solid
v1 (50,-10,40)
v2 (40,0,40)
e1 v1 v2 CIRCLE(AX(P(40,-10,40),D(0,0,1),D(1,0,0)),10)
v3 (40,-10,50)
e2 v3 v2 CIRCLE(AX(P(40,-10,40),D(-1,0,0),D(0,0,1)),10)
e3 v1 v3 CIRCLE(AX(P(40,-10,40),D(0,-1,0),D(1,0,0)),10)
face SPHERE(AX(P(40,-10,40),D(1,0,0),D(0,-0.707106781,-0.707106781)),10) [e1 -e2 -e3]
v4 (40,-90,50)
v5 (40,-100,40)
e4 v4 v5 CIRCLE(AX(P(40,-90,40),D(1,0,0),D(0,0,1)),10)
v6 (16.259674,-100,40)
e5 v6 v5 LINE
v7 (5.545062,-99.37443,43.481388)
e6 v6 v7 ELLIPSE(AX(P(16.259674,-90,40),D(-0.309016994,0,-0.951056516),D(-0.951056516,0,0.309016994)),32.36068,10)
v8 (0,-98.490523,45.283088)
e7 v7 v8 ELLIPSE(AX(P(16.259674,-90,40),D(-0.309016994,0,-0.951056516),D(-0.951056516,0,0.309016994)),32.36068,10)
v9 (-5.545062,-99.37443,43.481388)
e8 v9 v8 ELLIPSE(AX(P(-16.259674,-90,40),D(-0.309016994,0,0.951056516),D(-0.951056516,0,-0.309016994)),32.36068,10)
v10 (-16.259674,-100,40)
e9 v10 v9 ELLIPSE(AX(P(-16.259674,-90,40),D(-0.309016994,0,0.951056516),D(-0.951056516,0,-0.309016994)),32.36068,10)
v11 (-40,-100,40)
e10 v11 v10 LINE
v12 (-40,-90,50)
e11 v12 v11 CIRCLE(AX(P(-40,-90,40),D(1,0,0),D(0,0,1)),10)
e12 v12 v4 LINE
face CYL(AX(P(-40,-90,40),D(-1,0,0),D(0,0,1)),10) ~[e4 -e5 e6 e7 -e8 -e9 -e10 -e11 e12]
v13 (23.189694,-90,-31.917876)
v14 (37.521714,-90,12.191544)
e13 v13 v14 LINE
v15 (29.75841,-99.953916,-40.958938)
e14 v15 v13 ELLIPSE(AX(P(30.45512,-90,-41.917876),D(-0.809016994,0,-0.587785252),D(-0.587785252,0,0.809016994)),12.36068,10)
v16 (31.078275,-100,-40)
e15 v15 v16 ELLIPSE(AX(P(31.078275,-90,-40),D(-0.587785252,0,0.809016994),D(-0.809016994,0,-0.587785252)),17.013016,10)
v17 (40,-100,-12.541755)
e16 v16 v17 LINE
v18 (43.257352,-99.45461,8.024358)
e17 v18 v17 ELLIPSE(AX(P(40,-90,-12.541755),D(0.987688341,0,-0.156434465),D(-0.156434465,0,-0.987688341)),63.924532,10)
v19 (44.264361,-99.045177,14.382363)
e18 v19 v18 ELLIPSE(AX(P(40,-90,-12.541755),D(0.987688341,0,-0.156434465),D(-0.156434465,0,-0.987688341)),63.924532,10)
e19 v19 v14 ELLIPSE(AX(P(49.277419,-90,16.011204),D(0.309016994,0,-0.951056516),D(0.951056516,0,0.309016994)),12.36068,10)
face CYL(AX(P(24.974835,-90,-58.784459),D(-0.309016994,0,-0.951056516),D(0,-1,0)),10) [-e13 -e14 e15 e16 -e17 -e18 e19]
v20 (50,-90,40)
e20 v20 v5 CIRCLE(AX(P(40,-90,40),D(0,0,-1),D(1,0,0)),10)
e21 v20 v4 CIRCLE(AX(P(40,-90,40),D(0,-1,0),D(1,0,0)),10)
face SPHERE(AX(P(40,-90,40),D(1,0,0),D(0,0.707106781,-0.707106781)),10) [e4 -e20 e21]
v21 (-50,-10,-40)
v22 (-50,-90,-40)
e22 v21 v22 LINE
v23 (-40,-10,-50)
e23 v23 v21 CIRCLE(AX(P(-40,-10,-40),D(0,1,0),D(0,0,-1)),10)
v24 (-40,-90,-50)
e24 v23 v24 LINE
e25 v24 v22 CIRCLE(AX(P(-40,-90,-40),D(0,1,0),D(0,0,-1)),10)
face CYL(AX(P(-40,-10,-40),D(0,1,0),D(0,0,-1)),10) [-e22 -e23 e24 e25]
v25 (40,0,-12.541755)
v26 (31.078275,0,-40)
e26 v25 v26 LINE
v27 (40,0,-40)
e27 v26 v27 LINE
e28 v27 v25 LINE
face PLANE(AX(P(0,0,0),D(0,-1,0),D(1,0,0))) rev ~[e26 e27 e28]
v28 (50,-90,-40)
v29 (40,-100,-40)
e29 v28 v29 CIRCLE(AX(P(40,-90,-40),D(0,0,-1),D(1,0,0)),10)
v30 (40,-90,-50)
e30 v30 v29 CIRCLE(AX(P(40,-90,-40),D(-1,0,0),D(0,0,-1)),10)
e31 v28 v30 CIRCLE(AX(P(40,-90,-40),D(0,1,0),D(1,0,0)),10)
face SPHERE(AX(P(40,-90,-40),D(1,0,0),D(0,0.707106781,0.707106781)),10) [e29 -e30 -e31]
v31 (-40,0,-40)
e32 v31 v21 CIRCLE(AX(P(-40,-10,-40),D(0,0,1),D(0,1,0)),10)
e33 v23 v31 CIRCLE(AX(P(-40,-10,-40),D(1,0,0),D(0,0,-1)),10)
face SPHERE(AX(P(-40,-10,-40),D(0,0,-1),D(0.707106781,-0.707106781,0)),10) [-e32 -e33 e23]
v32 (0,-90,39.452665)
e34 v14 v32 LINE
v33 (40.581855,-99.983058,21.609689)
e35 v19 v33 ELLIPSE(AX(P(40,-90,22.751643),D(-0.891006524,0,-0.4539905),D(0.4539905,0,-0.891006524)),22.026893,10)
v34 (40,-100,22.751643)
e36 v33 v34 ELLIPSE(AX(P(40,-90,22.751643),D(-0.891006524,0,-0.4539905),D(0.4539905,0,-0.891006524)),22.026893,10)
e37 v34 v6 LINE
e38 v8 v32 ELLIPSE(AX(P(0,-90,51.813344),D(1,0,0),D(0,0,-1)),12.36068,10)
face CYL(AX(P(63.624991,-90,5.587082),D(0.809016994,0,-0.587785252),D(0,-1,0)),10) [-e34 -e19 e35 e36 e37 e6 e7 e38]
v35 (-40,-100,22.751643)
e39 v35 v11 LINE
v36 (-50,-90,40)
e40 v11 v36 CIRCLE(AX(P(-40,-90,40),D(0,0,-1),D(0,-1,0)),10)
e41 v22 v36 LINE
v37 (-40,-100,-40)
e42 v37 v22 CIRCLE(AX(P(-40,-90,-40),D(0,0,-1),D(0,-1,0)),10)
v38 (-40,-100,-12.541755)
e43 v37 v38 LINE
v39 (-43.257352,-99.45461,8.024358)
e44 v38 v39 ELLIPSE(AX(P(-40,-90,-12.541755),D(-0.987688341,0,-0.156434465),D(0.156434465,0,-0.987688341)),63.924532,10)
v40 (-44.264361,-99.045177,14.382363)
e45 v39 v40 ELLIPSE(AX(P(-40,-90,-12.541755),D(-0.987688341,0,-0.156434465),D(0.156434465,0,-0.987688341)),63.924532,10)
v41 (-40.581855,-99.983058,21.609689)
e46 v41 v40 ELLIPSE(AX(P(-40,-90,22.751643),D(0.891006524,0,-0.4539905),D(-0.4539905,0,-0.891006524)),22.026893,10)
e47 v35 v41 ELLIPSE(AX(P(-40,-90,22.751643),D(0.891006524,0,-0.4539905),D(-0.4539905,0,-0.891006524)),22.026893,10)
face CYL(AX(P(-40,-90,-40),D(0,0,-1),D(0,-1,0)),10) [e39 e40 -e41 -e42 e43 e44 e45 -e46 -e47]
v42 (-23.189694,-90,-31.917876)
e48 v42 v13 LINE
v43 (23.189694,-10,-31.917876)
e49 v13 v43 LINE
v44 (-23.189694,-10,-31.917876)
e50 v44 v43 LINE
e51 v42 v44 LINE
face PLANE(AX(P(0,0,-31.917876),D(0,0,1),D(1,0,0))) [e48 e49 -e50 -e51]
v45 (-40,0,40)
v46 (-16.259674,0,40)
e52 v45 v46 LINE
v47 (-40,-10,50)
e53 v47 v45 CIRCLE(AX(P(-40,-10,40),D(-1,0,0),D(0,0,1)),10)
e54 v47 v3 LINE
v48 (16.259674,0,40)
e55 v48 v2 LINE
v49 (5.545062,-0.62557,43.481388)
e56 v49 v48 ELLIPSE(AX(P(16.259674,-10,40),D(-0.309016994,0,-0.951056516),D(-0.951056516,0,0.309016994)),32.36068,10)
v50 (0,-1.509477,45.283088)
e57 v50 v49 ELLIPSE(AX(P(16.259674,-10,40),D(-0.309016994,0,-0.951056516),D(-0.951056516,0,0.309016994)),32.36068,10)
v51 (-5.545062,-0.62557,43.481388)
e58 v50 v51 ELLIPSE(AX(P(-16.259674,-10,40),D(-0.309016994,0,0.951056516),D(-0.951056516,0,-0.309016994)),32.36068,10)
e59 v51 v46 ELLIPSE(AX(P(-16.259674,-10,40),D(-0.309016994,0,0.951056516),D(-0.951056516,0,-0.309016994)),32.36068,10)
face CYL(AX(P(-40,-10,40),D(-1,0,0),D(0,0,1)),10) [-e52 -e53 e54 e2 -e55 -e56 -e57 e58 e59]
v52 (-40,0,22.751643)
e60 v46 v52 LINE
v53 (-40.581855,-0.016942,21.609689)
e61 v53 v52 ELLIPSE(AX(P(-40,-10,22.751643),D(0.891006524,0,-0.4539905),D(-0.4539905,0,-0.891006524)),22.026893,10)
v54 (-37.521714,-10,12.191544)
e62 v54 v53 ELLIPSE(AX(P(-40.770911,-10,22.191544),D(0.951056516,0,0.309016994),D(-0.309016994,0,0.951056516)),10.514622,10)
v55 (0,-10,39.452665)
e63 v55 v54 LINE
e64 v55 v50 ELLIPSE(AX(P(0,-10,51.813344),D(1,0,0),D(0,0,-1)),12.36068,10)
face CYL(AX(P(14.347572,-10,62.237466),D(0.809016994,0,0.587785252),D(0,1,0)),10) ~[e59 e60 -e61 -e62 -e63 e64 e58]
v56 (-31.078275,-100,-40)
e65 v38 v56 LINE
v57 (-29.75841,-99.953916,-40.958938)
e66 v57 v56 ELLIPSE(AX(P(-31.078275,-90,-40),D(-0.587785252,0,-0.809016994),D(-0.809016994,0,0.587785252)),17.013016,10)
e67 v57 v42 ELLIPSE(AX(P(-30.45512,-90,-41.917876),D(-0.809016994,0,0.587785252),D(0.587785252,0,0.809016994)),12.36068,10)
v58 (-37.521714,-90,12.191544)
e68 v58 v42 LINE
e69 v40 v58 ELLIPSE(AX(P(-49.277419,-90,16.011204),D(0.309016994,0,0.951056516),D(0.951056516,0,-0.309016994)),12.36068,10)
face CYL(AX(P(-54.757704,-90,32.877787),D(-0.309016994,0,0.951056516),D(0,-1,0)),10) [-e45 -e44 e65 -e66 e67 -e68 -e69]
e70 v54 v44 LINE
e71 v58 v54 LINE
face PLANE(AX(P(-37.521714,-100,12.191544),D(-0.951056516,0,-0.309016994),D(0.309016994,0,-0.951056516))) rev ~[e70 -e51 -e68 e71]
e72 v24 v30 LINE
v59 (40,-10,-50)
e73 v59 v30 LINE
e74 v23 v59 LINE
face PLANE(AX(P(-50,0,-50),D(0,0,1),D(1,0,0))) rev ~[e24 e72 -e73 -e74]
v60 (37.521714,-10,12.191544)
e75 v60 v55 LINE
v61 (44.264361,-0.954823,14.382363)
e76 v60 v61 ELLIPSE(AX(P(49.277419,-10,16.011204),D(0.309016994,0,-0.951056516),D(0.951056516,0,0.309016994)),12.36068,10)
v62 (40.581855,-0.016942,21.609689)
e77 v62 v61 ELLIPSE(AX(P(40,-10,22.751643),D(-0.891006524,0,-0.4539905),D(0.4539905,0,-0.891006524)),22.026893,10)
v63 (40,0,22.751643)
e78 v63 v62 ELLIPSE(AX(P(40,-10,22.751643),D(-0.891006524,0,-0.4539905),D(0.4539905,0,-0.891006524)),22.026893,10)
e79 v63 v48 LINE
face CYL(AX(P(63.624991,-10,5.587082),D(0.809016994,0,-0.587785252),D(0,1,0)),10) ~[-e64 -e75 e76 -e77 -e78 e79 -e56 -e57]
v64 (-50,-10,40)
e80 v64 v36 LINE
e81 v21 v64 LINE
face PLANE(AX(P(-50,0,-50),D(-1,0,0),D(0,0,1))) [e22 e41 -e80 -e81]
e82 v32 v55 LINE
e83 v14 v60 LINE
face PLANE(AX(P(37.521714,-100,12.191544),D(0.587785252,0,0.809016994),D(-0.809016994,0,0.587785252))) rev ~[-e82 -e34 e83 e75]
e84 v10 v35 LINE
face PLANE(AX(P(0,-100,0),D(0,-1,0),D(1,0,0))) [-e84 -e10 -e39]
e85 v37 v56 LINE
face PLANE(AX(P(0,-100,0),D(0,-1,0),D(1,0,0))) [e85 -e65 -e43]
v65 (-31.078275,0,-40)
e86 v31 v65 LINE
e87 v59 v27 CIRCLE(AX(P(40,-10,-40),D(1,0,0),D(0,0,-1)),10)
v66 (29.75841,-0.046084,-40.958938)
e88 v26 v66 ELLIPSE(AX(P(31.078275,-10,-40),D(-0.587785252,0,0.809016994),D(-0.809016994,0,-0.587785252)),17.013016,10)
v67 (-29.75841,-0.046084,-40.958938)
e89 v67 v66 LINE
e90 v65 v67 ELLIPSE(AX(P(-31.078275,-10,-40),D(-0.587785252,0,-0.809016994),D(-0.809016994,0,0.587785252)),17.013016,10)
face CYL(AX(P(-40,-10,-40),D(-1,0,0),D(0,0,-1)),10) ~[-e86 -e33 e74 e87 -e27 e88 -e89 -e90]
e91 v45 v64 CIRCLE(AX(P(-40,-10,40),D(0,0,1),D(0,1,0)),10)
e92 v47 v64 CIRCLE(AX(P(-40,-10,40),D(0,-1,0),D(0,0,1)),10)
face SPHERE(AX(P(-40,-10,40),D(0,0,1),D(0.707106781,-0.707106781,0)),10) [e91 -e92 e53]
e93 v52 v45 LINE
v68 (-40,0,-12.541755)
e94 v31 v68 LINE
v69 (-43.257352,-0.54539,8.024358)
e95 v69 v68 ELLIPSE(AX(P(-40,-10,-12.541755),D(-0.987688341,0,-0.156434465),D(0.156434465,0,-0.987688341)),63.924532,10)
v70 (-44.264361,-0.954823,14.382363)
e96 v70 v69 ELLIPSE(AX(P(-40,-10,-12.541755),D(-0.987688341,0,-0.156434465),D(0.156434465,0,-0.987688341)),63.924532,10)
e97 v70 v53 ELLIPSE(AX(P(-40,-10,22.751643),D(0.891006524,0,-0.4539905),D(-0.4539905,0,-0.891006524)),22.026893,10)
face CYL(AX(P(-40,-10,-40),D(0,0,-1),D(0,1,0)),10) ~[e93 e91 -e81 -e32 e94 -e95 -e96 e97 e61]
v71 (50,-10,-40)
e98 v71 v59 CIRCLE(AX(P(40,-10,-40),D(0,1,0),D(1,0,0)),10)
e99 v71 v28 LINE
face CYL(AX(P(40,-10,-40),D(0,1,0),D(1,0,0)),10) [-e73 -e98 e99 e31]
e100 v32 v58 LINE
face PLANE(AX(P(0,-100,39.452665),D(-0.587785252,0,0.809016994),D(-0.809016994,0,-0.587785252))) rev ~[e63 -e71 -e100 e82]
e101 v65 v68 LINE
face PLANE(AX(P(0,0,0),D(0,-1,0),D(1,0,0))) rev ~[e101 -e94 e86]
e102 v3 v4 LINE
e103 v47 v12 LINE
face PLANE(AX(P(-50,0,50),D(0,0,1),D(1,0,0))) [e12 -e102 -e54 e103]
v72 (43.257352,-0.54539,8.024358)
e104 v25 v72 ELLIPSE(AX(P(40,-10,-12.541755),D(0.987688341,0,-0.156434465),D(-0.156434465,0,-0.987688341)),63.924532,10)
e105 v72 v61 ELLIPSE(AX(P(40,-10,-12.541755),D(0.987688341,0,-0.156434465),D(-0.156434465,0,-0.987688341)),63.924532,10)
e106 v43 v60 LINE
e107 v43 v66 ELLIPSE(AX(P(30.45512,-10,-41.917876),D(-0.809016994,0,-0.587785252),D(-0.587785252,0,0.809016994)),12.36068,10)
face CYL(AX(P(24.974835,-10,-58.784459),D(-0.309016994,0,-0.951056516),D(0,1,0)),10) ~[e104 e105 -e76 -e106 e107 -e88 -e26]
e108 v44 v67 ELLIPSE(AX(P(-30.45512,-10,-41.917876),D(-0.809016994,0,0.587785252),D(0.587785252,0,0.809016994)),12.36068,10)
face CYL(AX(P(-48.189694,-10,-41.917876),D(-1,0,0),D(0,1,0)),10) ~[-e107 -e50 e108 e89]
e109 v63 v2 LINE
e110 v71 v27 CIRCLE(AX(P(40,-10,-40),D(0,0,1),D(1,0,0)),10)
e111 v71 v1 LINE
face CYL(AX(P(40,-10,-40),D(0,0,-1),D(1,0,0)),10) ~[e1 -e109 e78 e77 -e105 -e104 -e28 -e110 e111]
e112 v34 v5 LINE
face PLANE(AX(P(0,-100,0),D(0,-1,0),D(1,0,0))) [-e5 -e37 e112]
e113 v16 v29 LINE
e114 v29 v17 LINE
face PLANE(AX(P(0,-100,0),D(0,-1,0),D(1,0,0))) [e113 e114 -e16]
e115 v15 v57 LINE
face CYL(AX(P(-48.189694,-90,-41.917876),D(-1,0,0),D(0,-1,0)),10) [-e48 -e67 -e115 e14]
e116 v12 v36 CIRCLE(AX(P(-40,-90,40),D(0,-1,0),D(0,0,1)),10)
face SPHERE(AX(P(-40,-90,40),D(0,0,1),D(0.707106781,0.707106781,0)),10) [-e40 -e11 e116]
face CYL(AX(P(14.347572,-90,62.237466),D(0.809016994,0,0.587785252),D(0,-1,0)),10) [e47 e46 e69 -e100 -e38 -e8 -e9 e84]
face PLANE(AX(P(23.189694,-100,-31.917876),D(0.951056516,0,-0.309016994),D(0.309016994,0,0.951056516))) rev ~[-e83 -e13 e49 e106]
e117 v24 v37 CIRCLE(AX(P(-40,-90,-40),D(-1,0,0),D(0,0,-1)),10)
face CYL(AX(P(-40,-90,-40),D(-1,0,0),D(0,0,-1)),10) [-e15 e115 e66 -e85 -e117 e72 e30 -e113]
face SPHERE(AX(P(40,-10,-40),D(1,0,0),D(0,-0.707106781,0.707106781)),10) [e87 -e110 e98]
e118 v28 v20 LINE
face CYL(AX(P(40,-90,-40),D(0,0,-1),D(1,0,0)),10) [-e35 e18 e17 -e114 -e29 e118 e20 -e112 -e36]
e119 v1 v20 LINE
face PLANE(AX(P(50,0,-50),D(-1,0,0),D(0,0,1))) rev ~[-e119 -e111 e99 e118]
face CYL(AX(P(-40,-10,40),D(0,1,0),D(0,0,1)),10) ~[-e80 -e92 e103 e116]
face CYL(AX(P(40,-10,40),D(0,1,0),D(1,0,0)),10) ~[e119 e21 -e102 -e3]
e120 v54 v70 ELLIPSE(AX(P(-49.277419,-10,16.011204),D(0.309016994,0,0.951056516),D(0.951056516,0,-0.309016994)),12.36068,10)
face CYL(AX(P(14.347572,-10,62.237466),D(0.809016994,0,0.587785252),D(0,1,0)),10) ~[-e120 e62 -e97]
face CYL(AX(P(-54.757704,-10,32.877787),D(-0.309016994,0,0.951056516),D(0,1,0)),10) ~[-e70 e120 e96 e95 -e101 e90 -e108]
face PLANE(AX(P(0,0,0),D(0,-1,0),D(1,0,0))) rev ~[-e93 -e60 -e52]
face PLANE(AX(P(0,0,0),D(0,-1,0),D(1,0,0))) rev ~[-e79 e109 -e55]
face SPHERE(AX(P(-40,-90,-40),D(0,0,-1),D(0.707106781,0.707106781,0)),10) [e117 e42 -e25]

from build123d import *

# Parameters (mm, degrees)
F0_W          = 100
F0_H          = 100
F1_DEPTH      = 100
F3_DEPTH      = 134.3
F4_T1_DEPTH   = 80
F4_T3_DEPTH   = 80
F4_T5_DEPTH   = 80
F4_S9_W       = 10
F4_S9_H       = 10
F4_T10_DEPTH  = 10
F4_S15_W      = 10
F4_S15_H      = 10
F4_T16_DEPTH  = 10
F4_S21_W      = 10
F4_S21_H      = 10
F4_T22_DEPTH  = 10
F4_S27_W      = 10
F4_S27_H      = 10
F4_T28_DEPTH  = 10
F4_S33_W      = 10
F4_S33_H      = 10
F4_T34_DEPTH  = 10
F4_S39_W      = 10
F4_S39_H      = 10
F4_T40_DEPTH  = 10
F4_S45_W      = 10
F4_S45_H      = 10
F4_T46_DEPTH  = 10
F4_S51_W      = 10
F4_S51_H      = 10
F4_T52_DEPTH  = 10
F4_T58_DEPTH  = 96.3793887771
F4_T64_DEPTH  = 96.3793887771
F4_T70_DEPTH  = 96.3793887771
F4_T76_DEPTH  = 96.3793887771
F4_T82_DEPTH  = 96.3793887771
F4_T88_DEPTH  = 96.3793887771
F4_T94_DEPTH  = 96.3793887771
F4_T100_DEPTH = 96.3793887771
F4_T106_DEPTH = 96.3793887771
F4_T112_DEPTH = 96.3793887771
F4_T119_DEPTH = 96.3793887771
F4_T123_DEPTH = 96.3793887771
F4_T130_DEPTH = 96.3793887771
F4_T134_DEPTH = 96.3793887771
F4_T141_DEPTH = 96.3793887771
F4_T145_DEPTH = 96.3793887771
F4_T152_DEPTH = 96.3793887771
F4_T156_DEPTH = 96.3793887771
F4_T163_DEPTH = 96.3793887771
F4_T167_DEPTH = 96.3793887771
F4_T174_DEPTH = 96.3793887771
F4_T178_DEPTH = 96.3793887771
F4_T185_DEPTH = 96.3793887771
F4_T189_DEPTH = 96.3793887771
F4_T196_DEPTH = 96.3793887771
F4_T200_DEPTH = 96.3793887771
F4_T207_DEPTH = 96.3793887771
F4_T211_DEPTH = 96.3793887771
F4_T218_DEPTH = 96.3793887771
F4_T222_DEPTH = 96.3793887771


# Not quite as in the source:
# - a fillet or chamfer that OpenCascade refuses, or shapes differently, is made with other operations: its cross-section is extruded or revolved along the edge and cut away or added


with BuildPart() as f1:
    # F0 (on Front) → F1 (new body)
    with BuildSketch(Plane.XZ):
        Rectangle(F0_W, F0_H)
    extrude(amount=F1_DEPTH)

    # F2 (on face) → F3 (cut)
    with BuildSketch(Plane.XZ.offset(100)):
        Polygon((37.5217137094, 12.1915438206), (0, 39.4526645541), (-37.5217137094, 12.1915438206), (-23.1896943886, -31.9178760977), (23.1896943886, -31.9178760977), align=None)
    extrude(amount=-F3_DEPTH, mode=Mode.SUBTRACT)

    # F4: fillet of radius 10 on 22 edges, made by hand

    # F4_s2 → F4_t1 (cut)
    with BuildSketch(Plane.XZ.offset(10)):
        with BuildLine():
            ThreePointArc((50, -40), (47.0710678119, -47.0710678119), (40, -50))
            Line((40, -50), (50, -50))
            Line((50, -50), (50, -40))
        make_face()
        with BuildLine():
            ThreePointArc((50, 40), (47.0710678119, 47.0710678119), (40, 50))
            Line((40, 50), (50, 50))
            Line((50, 50), (50, 40))
        make_face()
        with BuildLine():
            ThreePointArc((-40, 50), (-47.0710678119, 47.0710678119), (-50, 40))
            Line((-50, 40), (-50, 50))
            Line((-50, 50), (-40, 50))
        make_face()
        with BuildLine():
            ThreePointArc((-40, -50), (-47.0710678119, -47.0710678119), (-50, -40))
            Line((-50, -40), (-50, -50))
            Line((-50, -50), (-40, -50))
        make_face()
    extrude(amount=F4_T1_DEPTH, mode=Mode.SUBTRACT)

    # F4_s4 → F4_t3 (cut)
    with BuildSketch(Plane.XY.offset(-40)):
        with BuildLine():
            ThreePointArc((50, -10), (47.0710678119, -2.9289321881), (40, 0))
            Line((40, 0), (50, 0))
            Line((50, 0), (50, -10))
        make_face()
        with BuildLine():
            ThreePointArc((50, -90), (47.0710678119, -97.0710678119), (40, -100))
            Line((40, -100), (50, -100))
            Line((50, -100), (50, -90))
        make_face()
        with BuildLine():
            ThreePointArc((-40, 0), (-47.0710678119, -2.9289321881), (-50, -10))
            Line((-50, -10), (-50, 0))
            Line((-50, 0), (-40, 0))
        make_face()
        with BuildLine():
            ThreePointArc((-40, -100), (-47.0710678119, -97.0710678119), (-50, -90))
            Line((-50, -90), (-50, -100))
            Line((-50, -100), (-40, -100))
        make_face()
    extrude(amount=F4_T3_DEPTH, mode=Mode.SUBTRACT)

    # F4_s6 → F4_t5 (cut)
    with BuildSketch(Plane.YZ.offset(-40)):
        with BuildLine():
            ThreePointArc((-10, 50), (-2.9289321881, 47.0710678119), (0, 40))
            Line((0, 40), (0, 50))
            Line((0, 50), (-10, 50))
        make_face()
        with BuildLine():
            ThreePointArc((-90, 50), (-97.0710678119, 47.0710678119), (-100, 40))
            Line((-100, 40), (-100, 50))
            Line((-100, 50), (-90, 50))
        make_face()
        with BuildLine():
            ThreePointArc((-10, -50), (-2.9289321881, -47.0710678119), (0, -40))
            Line((0, -40), (0, -50))
            Line((0, -50), (-10, -50))
        make_face()
        with BuildLine():
            ThreePointArc((-90, -50), (-97.0710678119, -47.0710678119), (-100, -40))
            Line((-100, -40), (-100, -50))
            Line((-100, -50), (-90, -50))
        make_face()
    extrude(amount=F4_T5_DEPTH, mode=Mode.SUBTRACT)


with BuildPart() as f4_tool8:
    # F4_s9 → F4_t10 (new body)
    with BuildSketch(Plane.YZ.offset(40)):
        with Locations((-5, -45)):
            Rectangle(F4_S9_W, F4_S9_H)
    extrude(amount=F4_T10_DEPTH)

    # F4_s11 → F4_t12 (revolve, cut)
    with BuildSketch(Plane(origin=(40, -10, -40), x_dir=(0, -0.7071067812, 0.7071067812), z_dir=(0, 0.7071067812, 0.7071067812))):
        with BuildLine():
            ThreePointArc((0, -10), (10, 0), (0, 10))
            Line((0, 10), (0, -10))
        make_face()
    revolve(axis=Axis((40, -10, -40), (1, 0, 0)), mode=Mode.SUBTRACT)


with BuildPart() as f1_1:
    add(f1.part)

    # F4_t7: cut F4_tool8
    add(f4_tool8.part, mode=Mode.SUBTRACT)


with BuildPart() as f4_tool14:
    # F4_s15 → F4_t16 (new body)
    with BuildSketch(Plane.YZ.offset(40)):
        with Locations((-95, -45)):
            Rectangle(F4_S15_W, F4_S15_H)
    extrude(amount=F4_T16_DEPTH)

    # F4_s17 → F4_t18 (revolve, cut)
    with BuildSketch(Plane(origin=(40, -90, -40), x_dir=(0, 0.7071067812, 0.7071067812), z_dir=(0, 0.7071067812, -0.7071067812))):
        with BuildLine():
            ThreePointArc((0, -10), (10, 0), (0, 10))
            Line((0, 10), (0, -10))
        make_face()
    revolve(axis=Axis((40, -90, -40), (1, 0, 0)), mode=Mode.SUBTRACT)


with BuildPart() as f1_2:
    add(f1_1.part)

    # F4_t13: cut F4_tool14
    add(f4_tool14.part, mode=Mode.SUBTRACT)


with BuildPart() as f4_tool20:
    # F4_s21 → F4_t22 (new body)
    with BuildSketch(Plane.YZ.offset(40)):
        with Locations((-5, 45)):
            Rectangle(F4_S21_W, F4_S21_H)
    extrude(amount=F4_T22_DEPTH)

    # F4_s23 → F4_t24 (revolve, cut)
    with BuildSketch(Plane(origin=(40, -10, 40), x_dir=(0, -0.7071067812, -0.7071067812), z_dir=(0, -0.7071067812, 0.7071067812))):
        with BuildLine():
            ThreePointArc((0, -10), (10, 0), (0, 10))
            Line((0, 10), (0, -10))
        make_face()
    revolve(axis=Axis((40, -10, 40), (1, 0, 0)), mode=Mode.SUBTRACT)


with BuildPart() as f1_3:
    add(f1_2.part)

    # F4_t19: cut F4_tool20
    add(f4_tool20.part, mode=Mode.SUBTRACT)


with BuildPart() as f4_tool26:
    # F4_s27 → F4_t28 (new body)
    with BuildSketch(Plane.YZ.offset(40)):
        with Locations((-95, 45)):
            Rectangle(F4_S27_W, F4_S27_H)
    extrude(amount=F4_T28_DEPTH)

    # F4_s29 → F4_t30 (revolve, cut)
    with BuildSketch(Plane(origin=(40, -90, 40), x_dir=(0, 0.7071067812, -0.7071067812), z_dir=(0, -0.7071067812, -0.7071067812))):
        with BuildLine():
            ThreePointArc((0, -10), (10, 0), (0, 10))
            Line((0, 10), (0, -10))
        make_face()
    revolve(axis=Axis((40, -90, 40), (1, 0, 0)), mode=Mode.SUBTRACT)


with BuildPart() as f1_4:
    add(f1_3.part)

    # F4_t25: cut F4_tool26
    add(f4_tool26.part, mode=Mode.SUBTRACT)


with BuildPart() as f4_tool32:
    # F4_s33 → F4_t34 (new body)
    with BuildSketch(Plane.XY.offset(40)):
        with Locations((-45, -5)):
            Rectangle(F4_S33_W, F4_S33_H)
    extrude(amount=F4_T34_DEPTH)

    # F4_s35 → F4_t36 (revolve, cut)
    with BuildSketch(Plane(origin=(-40, -10, 40), x_dir=(0.7071067812, -0.7071067812, 0), z_dir=(-0.7071067812, -0.7071067812, 0))):
        with BuildLine():
            ThreePointArc((0, -10), (10, 0), (0, 10))
            Line((0, 10), (0, -10))
        make_face()
    revolve(axis=Axis((-40, -10, 40), (0, 0, 1)), mode=Mode.SUBTRACT)


with BuildPart() as f1_5:
    add(f1_4.part)

    # F4_t31: cut F4_tool32
    add(f4_tool32.part, mode=Mode.SUBTRACT)


with BuildPart() as f4_tool38:
    # F4_s39 → F4_t40 (new body)
    with BuildSketch(Plane.XY.offset(40)):
        with Locations((-45, -95)):
            Rectangle(F4_S39_W, F4_S39_H)
    extrude(amount=F4_T40_DEPTH)

    # F4_s41 → F4_t42 (revolve, cut)
    with BuildSketch(Plane(origin=(-40, -90, 40), x_dir=(0.7071067812, 0.7071067812, 0), z_dir=(0.7071067812, -0.7071067812, 0))):
        with BuildLine():
            ThreePointArc((0, -10), (10, 0), (0, 10))
            Line((0, 10), (0, -10))
        make_face()
    revolve(axis=Axis((-40, -90, 40), (0, 0, 1)), mode=Mode.SUBTRACT)


with BuildPart() as f1_6:
    add(f1_5.part)

    # F4_t37: cut F4_tool38
    add(f4_tool38.part, mode=Mode.SUBTRACT)


with BuildPart() as f4_tool44:
    # F4_s45 → F4_t46 (new body)
    with BuildSketch(Plane.XY.offset(-40)):
        with Locations((-45, -5)):
            Rectangle(F4_S45_W, F4_S45_H)
    extrude(amount=-F4_T46_DEPTH)

    # F4_s47 → F4_t48 (revolve, cut)
    with BuildSketch(Plane(origin=(-40, -10, -40), x_dir=(0.7071067812, -0.7071067812, 0), z_dir=(0.7071067812, 0.7071067812, 0))):
        with BuildLine():
            ThreePointArc((0, -10), (10, 0), (0, 10))
            Line((0, 10), (0, -10))
        make_face()
    revolve(axis=Axis((-40, -10, -40), (0, 0, -1)), mode=Mode.SUBTRACT)


with BuildPart() as f1_7:
    add(f1_6.part)

    # F4_t43: cut F4_tool44
    add(f4_tool44.part, mode=Mode.SUBTRACT)


with BuildPart() as f4_tool50:
    # F4_s51 → F4_t52 (new body)
    with BuildSketch(Plane.XY.offset(-40)):
        with Locations((-45, -95)):
            Rectangle(F4_S51_W, F4_S51_H)
    extrude(amount=-F4_T52_DEPTH)

    # F4_s53 → F4_t54 (revolve, cut)
    with BuildSketch(Plane(origin=(-40, -90, -40), x_dir=(0.7071067812, 0.7071067812, 0), z_dir=(-0.7071067812, 0.7071067812, 0))):
        with BuildLine():
            ThreePointArc((0, -10), (10, 0), (0, 10))
            Line((0, 10), (0, -10))
        make_face()
    revolve(axis=Axis((-40, -90, -40), (0, 0, -1)), mode=Mode.SUBTRACT)


with BuildPart() as f1_8:
    add(f1_7.part)

    # F4_t49: cut F4_tool50
    add(f4_tool50.part, mode=Mode.SUBTRACT)


with BuildPart() as f4_tool56:
    # F4_s57 → F4_t58 (new body)
    with BuildSketch(Plane(origin=(38.9862817141, 0, -28.3251916741), x_dir=(0, 1, 0), z_dir=(-0.8090169944, 0, 0.5877852523))):
        with BuildLine():
            ThreePointArc((0, -41.9178760977), (-2.9289321881, -34.8468082858), (-10, -31.9178760977))
            Line((-10, -31.9178760977), (0, -31.9178760977))
            Line((0, -31.9178760977), (0, -41.9178760977))
        make_face()
    extrude(amount=F4_T58_DEPTH)

    split(bisect_by=Plane(origin=(-18.7608568547, 0, 25.8221041874), x_dir=(0, 1, 0), z_dir=(0.5877852523, 0, -0.8090169944)), keep=Keep.TOP)

    split(bisect_by=Plane(origin=(30.355704049, 0, -9.8631661385), x_dir=(0, 1, 0), z_dir=(-0.9510565163, 0, 0.3090169944)), keep=Keep.TOP)


with BuildPart() as f1_9:
    add(f1_8.part)

    # F4_t55: cut F4_tool56
    add(f4_tool56.part, mode=Mode.SUBTRACT)


with BuildPart() as f4_tool62:
    # F4_s63 → F4_t64 (new body)
    with BuildSketch(Plane(origin=(38.9862817141, 0, 28.3251916741), x_dir=(0, 1, 0), z_dir=(-0.8090169944, 0, -0.5877852523))):
        with BuildLine():
            ThreePointArc((0, -41.9178760977), (-2.9289321881, -34.8468082858), (-10, -31.9178760977))
            Line((-10, -31.9178760977), (0, -31.9178760977))
            Line((0, -31.9178760977), (0, -41.9178760977))
        make_face()
    extrude(amount=F4_T64_DEPTH)

    split(bisect_by=Plane(origin=(18.7608568547, 0, 25.8221041874), x_dir=(0, 1, 0), z_dir=(-0.5877852523, 0, -0.8090169944)), keep=Keep.TOP)

    split(bisect_by=Plane(origin=(-30.355704049, 0, -9.8631661385), x_dir=(0, 1, 0), z_dir=(0.9510565163, 0, 0.3090169944)), keep=Keep.TOP)


with BuildPart() as f1_10:
    add(f1_9.part)

    # F4_t61: cut F4_tool62
    add(f4_tool62.part, mode=Mode.SUBTRACT)


with BuildPart() as f4_tool68:
    # F4_s69 → F4_t70 (new body)
    with BuildSketch(Plane(origin=(-14.8914345198, 0, 45.8311228665), x_dir=(0, 1, 0), z_dir=(0.3090169944, 0, -0.9510565163))):
        with BuildLine():
            ThreePointArc((0, -41.9178760977), (-2.9289321881, -34.8468082858), (-10, -31.9178760977))
            Line((-10, -31.9178760977), (0, -31.9178760977))
            Line((0, -31.9178760977), (0, -41.9178760977))
        make_face()
    extrude(amount=F4_T70_DEPTH)

    split(bisect_by=Plane(origin=(-18.7608568547, 0, 25.8221041874), x_dir=(0, 1, 0), z_dir=(0.5877852523, 0, -0.8090169944)), keep=Keep.TOP)

    split(bisect_by=Plane.XY.offset(-31.9178760977), keep=Keep.TOP)


with BuildPart() as f1_11:
    add(f1_10.part)

    # F4_t67: cut F4_tool68
    add(f4_tool68.part, mode=Mode.SUBTRACT)


with BuildPart() as f4_tool74:
    # F4_s75 → F4_t76 (new body)
    with BuildSketch(Plane.YZ.offset(-48.1896943886)):
        with BuildLine():
            ThreePointArc((0, -41.9178760977), (-2.9289321881, -34.8468082858), (-10, -31.9178760977))
            Line((-10, -31.9178760977), (0, -31.9178760977))
            Line((0, -31.9178760977), (0, -41.9178760977))
        make_face()
    extrude(amount=F4_T76_DEPTH)

    split(bisect_by=Plane(origin=(-30.355704049, 0, -9.8631661385), x_dir=(0, 1, 0), z_dir=(0.9510565163, 0, 0.3090169944)), keep=Keep.TOP)

    split(bisect_by=Plane(origin=(30.355704049, 0, -9.8631661385), x_dir=(0, 1, 0), z_dir=(-0.9510565163, 0, 0.3090169944)), keep=Keep.TOP)


with BuildPart() as f1_12:
    add(f1_11.part)

    # F4_t73: cut F4_tool74
    add(f4_tool74.part, mode=Mode.SUBTRACT)


with BuildPart() as f4_tool80:
    # F4_s81 → F4_t82 (new body)
    with BuildSketch(Plane(origin=(-14.8914345198, 0, -45.8311228665), x_dir=(0, 1, 0), z_dir=(0.3090169944, 0, 0.9510565163))):
        with BuildLine():
            ThreePointArc((0, -41.9178760977), (-2.9289321881, -34.8468082858), (-10, -31.9178760977))
            Line((-10, -31.9178760977), (0, -31.9178760977))
            Line((0, -31.9178760977), (0, -41.9178760977))
        make_face()
    extrude(amount=F4_T82_DEPTH)

    split(bisect_by=Plane(origin=(18.7608568547, 0, 25.8221041874), x_dir=(0, 1, 0), z_dir=(-0.5877852523, 0, -0.8090169944)), keep=Keep.TOP)

    split(bisect_by=Plane.XY.offset(-31.9178760977), keep=Keep.TOP)


with BuildPart() as f1_13:
    add(f1_12.part)

    # F4_t79: cut F4_tool80
    add(f4_tool80.part, mode=Mode.SUBTRACT)


with BuildPart() as f4_tool86:
    # F4_s87 → F4_t88 (new body)
    with BuildSketch(Plane(origin=(38.9862817141, 0, -28.3251916741), x_dir=(0, 1, 0), z_dir=(-0.8090169944, 0, 0.5877852523))):
        with BuildLine():
            ThreePointArc((-100, -41.9178760977), (-97.0710678119, -34.8468082858), (-90, -31.9178760977))
            Line((-90, -31.9178760977), (-100, -31.9178760977))
            Line((-100, -31.9178760977), (-100, -41.9178760977))
        make_face()
    extrude(amount=F4_T88_DEPTH)

    split(bisect_by=Plane(origin=(-18.7608568547, 0, 25.8221041874), x_dir=(0, 1, 0), z_dir=(0.5877852523, 0, -0.8090169944)), keep=Keep.TOP)

    split(bisect_by=Plane(origin=(30.355704049, 0, -9.8631661385), x_dir=(0, 1, 0), z_dir=(-0.9510565163, 0, 0.3090169944)), keep=Keep.TOP)


with BuildPart() as f1_14:
    add(f1_13.part)

    # F4_t85: cut F4_tool86
    add(f4_tool86.part, mode=Mode.SUBTRACT)


with BuildPart() as f4_tool92:
    # F4_s93 → F4_t94 (new body)
    with BuildSketch(Plane(origin=(38.9862817141, 0, 28.3251916741), x_dir=(0, 1, 0), z_dir=(-0.8090169944, 0, -0.5877852523))):
        with BuildLine():
            ThreePointArc((-100, -41.9178760977), (-97.0710678119, -34.8468082858), (-90, -31.9178760977))
            Line((-90, -31.9178760977), (-100, -31.9178760977))
            Line((-100, -31.9178760977), (-100, -41.9178760977))
        make_face()
    extrude(amount=F4_T94_DEPTH)

    split(bisect_by=Plane(origin=(18.7608568547, 0, 25.8221041874), x_dir=(0, 1, 0), z_dir=(-0.5877852523, 0, -0.8090169944)), keep=Keep.TOP)

    split(bisect_by=Plane(origin=(-30.355704049, 0, -9.8631661385), x_dir=(0, 1, 0), z_dir=(0.9510565163, 0, 0.3090169944)), keep=Keep.TOP)


with BuildPart() as f1_15:
    add(f1_14.part)

    # F4_t91: cut F4_tool92
    add(f4_tool92.part, mode=Mode.SUBTRACT)


with BuildPart() as f4_tool98:
    # F4_s99 → F4_t100 (new body)
    with BuildSketch(Plane(origin=(-14.8914345198, 0, 45.8311228665), x_dir=(0, 1, 0), z_dir=(0.3090169944, 0, -0.9510565163))):
        with BuildLine():
            ThreePointArc((-100, -41.9178760977), (-97.0710678119, -34.8468082858), (-90, -31.9178760977))
            Line((-90, -31.9178760977), (-100, -31.9178760977))
            Line((-100, -31.9178760977), (-100, -41.9178760977))
        make_face()
    extrude(amount=F4_T100_DEPTH)

    split(bisect_by=Plane(origin=(-18.7608568547, 0, 25.8221041874), x_dir=(0, 1, 0), z_dir=(0.5877852523, 0, -0.8090169944)), keep=Keep.TOP)

    split(bisect_by=Plane.XY.offset(-31.9178760977), keep=Keep.TOP)


with BuildPart() as f1_16:
    add(f1_15.part)

    # F4_t97: cut F4_tool98
    add(f4_tool98.part, mode=Mode.SUBTRACT)


with BuildPart() as f4_tool104:
    # F4_s105 → F4_t106 (new body)
    with BuildSketch(Plane.YZ.offset(-48.1896943886)):
        with BuildLine():
            ThreePointArc((-100, -41.9178760977), (-97.0710678119, -34.8468082858), (-90, -31.9178760977))
            Line((-90, -31.9178760977), (-100, -31.9178760977))
            Line((-100, -31.9178760977), (-100, -41.9178760977))
        make_face()
    extrude(amount=F4_T106_DEPTH)

    split(bisect_by=Plane(origin=(-30.355704049, 0, -9.8631661385), x_dir=(0, 1, 0), z_dir=(0.9510565163, 0, 0.3090169944)), keep=Keep.TOP)

    split(bisect_by=Plane(origin=(30.355704049, 0, -9.8631661385), x_dir=(0, 1, 0), z_dir=(-0.9510565163, 0, 0.3090169944)), keep=Keep.TOP)


with BuildPart() as f1_17:
    add(f1_16.part)

    # F4_t103: cut F4_tool104
    add(f4_tool104.part, mode=Mode.SUBTRACT)


with BuildPart() as f4_tool110:
    # F4_s111 → F4_t112 (new body)
    with BuildSketch(Plane(origin=(-14.8914345198, 0, -45.8311228665), x_dir=(0, 1, 0), z_dir=(0.3090169944, 0, 0.9510565163))):
        with BuildLine():
            ThreePointArc((-100, -41.9178760977), (-97.0710678119, -34.8468082858), (-90, -31.9178760977))
            Line((-90, -31.9178760977), (-100, -31.9178760977))
            Line((-100, -31.9178760977), (-100, -41.9178760977))
        make_face()
    extrude(amount=F4_T112_DEPTH)

    split(bisect_by=Plane(origin=(18.7608568547, 0, 25.8221041874), x_dir=(0, 1, 0), z_dir=(-0.5877852523, 0, -0.8090169944)), keep=Keep.TOP)

    split(bisect_by=Plane.XY.offset(-31.9178760977), keep=Keep.TOP)


with BuildPart() as f1_18:
    add(f1_17.part)

    # F4_t109: cut F4_tool110
    add(f4_tool110.part, mode=Mode.SUBTRACT)


with BuildPart() as f4_tool117:
    # F4_s118 → F4_t119 (new body)
    with BuildSketch(Plane(origin=(38.9862817141, 0, -28.3251916741), x_dir=(0, 1, 0), z_dir=(-0.8090169944, 0, 0.5877852523))):
        with BuildLine():
            ThreePointArc((0, -41.9178760977), (-2.9289321881, -34.8468082858), (-10, -31.9178760977))
            Line((-10, -31.9178760977), (0, -31.9178760977))
            Line((0, -31.9178760977), (0, -41.9178760977))
        make_face()
    extrude(amount=F4_T119_DEPTH)

    split(bisect_by=Plane(origin=(30.355704049, 0, -9.8631661385), x_dir=(0, 1, 0), z_dir=(0.9510565163, 0, -0.3090169944)), keep=Keep.TOP)


with BuildPart() as f4_tool121:
    # F4_s122 → F4_t123 (new body)
    with BuildSketch(Plane(origin=(-14.8914345198, 0, -45.8311228665), x_dir=(0, 1, 0), z_dir=(0.3090169944, 0, 0.9510565163))):
        with BuildLine():
            ThreePointArc((0, -41.9178760977), (-2.9289321881, -34.8468082858), (-10, -31.9178760977))
            Line((-10, -31.9178760977), (0, -31.9178760977))
            Line((0, -31.9178760977), (0, -41.9178760977))
        make_face()
    extrude(amount=F4_T123_DEPTH)

    split(bisect_by=Plane(origin=(18.7608568547, 0, 25.8221041874), x_dir=(0, 1, 0), z_dir=(0.5877852523, 0, 0.8090169944)), keep=Keep.TOP)


with BuildPart() as f4_tool117_1:
    add(f4_tool117.part)

    # F4_t125: intersect F4_tool121
    add(f4_tool121.part, mode=Mode.INTERSECT)


with BuildPart() as f1_19:
    add(f1_18.part)

    # F4_t115: cut F4_tool117
    add(f4_tool117_1.part, mode=Mode.SUBTRACT)


with BuildPart() as f4_tool128:
    # F4_s129 → F4_t130 (new body)
    with BuildSketch(Plane(origin=(38.9862817141, 0, -28.3251916741), x_dir=(0, 1, 0), z_dir=(-0.8090169944, 0, 0.5877852523))):
        with BuildLine():
            ThreePointArc((0, -41.9178760977), (-2.9289321881, -34.8468082858), (-10, -31.9178760977))
            Line((-10, -31.9178760977), (0, -31.9178760977))
            Line((0, -31.9178760977), (0, -41.9178760977))
        make_face()
    extrude(amount=F4_T130_DEPTH)

    split(bisect_by=Plane(origin=(-18.7608568547, 0, 25.8221041874), x_dir=(0, 1, 0), z_dir=(-0.5877852523, 0, 0.8090169944)), keep=Keep.TOP)


with BuildPart() as f4_tool132:
    # F4_s133 → F4_t134 (new body)
    with BuildSketch(Plane(origin=(38.9862817141, 0, 28.3251916741), x_dir=(0, 1, 0), z_dir=(-0.8090169944, 0, -0.5877852523))):
        with BuildLine():
            ThreePointArc((0, -41.9178760977), (-2.9289321881, -34.8468082858), (-10, -31.9178760977))
            Line((-10, -31.9178760977), (0, -31.9178760977))
            Line((0, -31.9178760977), (0, -41.9178760977))
        make_face()
    extrude(amount=F4_T134_DEPTH)

    split(bisect_by=Plane(origin=(18.7608568547, 0, 25.8221041874), x_dir=(0, 1, 0), z_dir=(0.5877852523, 0, 0.8090169944)), keep=Keep.TOP)


with BuildPart() as f4_tool128_1:
    add(f4_tool128.part)

    # F4_t136: intersect F4_tool132
    add(f4_tool132.part, mode=Mode.INTERSECT)


with BuildPart() as f1_20:
    add(f1_19.part)

    # F4_t126: cut F4_tool128
    add(f4_tool128_1.part, mode=Mode.SUBTRACT)


with BuildPart() as f4_tool139:
    # F4_s140 → F4_t141 (new body)
    with BuildSketch(Plane(origin=(38.9862817141, 0, 28.3251916741), x_dir=(0, 1, 0), z_dir=(-0.8090169944, 0, -0.5877852523))):
        with BuildLine():
            ThreePointArc((0, -41.9178760977), (-2.9289321881, -34.8468082858), (-10, -31.9178760977))
            Line((-10, -31.9178760977), (0, -31.9178760977))
            Line((0, -31.9178760977), (0, -41.9178760977))
        make_face()
    extrude(amount=F4_T141_DEPTH)

    split(bisect_by=Plane(origin=(-30.355704049, 0, -9.8631661385), x_dir=(0, 1, 0), z_dir=(-0.9510565163, 0, -0.3090169944)), keep=Keep.TOP)


with BuildPart() as f4_tool143:
    # F4_s144 → F4_t145 (new body)
    with BuildSketch(Plane(origin=(-14.8914345198, 0, 45.8311228665), x_dir=(0, 1, 0), z_dir=(0.3090169944, 0, -0.9510565163))):
        with BuildLine():
            ThreePointArc((0, -41.9178760977), (-2.9289321881, -34.8468082858), (-10, -31.9178760977))
            Line((-10, -31.9178760977), (0, -31.9178760977))
            Line((0, -31.9178760977), (0, -41.9178760977))
        make_face()
    extrude(amount=F4_T145_DEPTH)

    split(bisect_by=Plane(origin=(-18.7608568547, 0, 25.8221041874), x_dir=(0, 1, 0), z_dir=(-0.5877852523, 0, 0.8090169944)), keep=Keep.TOP)


with BuildPart() as f4_tool139_1:
    add(f4_tool139.part)

    # F4_t147: intersect F4_tool143
    add(f4_tool143.part, mode=Mode.INTERSECT)


with BuildPart() as f1_21:
    add(f1_20.part)

    # F4_t137: cut F4_tool139
    add(f4_tool139_1.part, mode=Mode.SUBTRACT)


with BuildPart() as f4_tool150:
    # F4_s151 → F4_t152 (new body)
    with BuildSketch(Plane(origin=(-14.8914345198, 0, 45.8311228665), x_dir=(0, 1, 0), z_dir=(0.3090169944, 0, -0.9510565163))):
        with BuildLine():
            ThreePointArc((0, -41.9178760977), (-2.9289321881, -34.8468082858), (-10, -31.9178760977))
            Line((-10, -31.9178760977), (0, -31.9178760977))
            Line((0, -31.9178760977), (0, -41.9178760977))
        make_face()
    extrude(amount=F4_T152_DEPTH)

    split(bisect_by=Plane.XY.offset(-31.9178760977), keep=Keep.BOTTOM)


with BuildPart() as f4_tool154:
    # F4_s155 → F4_t156 (new body)
    with BuildSketch(Plane.YZ.offset(-48.1896943886)):
        with BuildLine():
            ThreePointArc((0, -41.9178760977), (-2.9289321881, -34.8468082858), (-10, -31.9178760977))
            Line((-10, -31.9178760977), (0, -31.9178760977))
            Line((0, -31.9178760977), (0, -41.9178760977))
        make_face()
    extrude(amount=F4_T156_DEPTH)

    split(bisect_by=Plane(origin=(-30.355704049, 0, -9.8631661385), x_dir=(0, 1, 0), z_dir=(-0.9510565163, 0, -0.3090169944)), keep=Keep.TOP)


with BuildPart() as f4_tool150_1:
    add(f4_tool150.part)

    # F4_t158: intersect F4_tool154
    add(f4_tool154.part, mode=Mode.INTERSECT)


with BuildPart() as f1_22:
    add(f1_21.part)

    # F4_t148: cut F4_tool150
    add(f4_tool150_1.part, mode=Mode.SUBTRACT)


with BuildPart() as f4_tool161:
    # F4_s162 → F4_t163 (new body)
    with BuildSketch(Plane.YZ.offset(-48.1896943886)):
        with BuildLine():
            ThreePointArc((0, -41.9178760977), (-2.9289321881, -34.8468082858), (-10, -31.9178760977))
            Line((-10, -31.9178760977), (0, -31.9178760977))
            Line((0, -31.9178760977), (0, -41.9178760977))
        make_face()
    extrude(amount=F4_T163_DEPTH)

    split(bisect_by=Plane(origin=(30.355704049, 0, -9.8631661385), x_dir=(0, 1, 0), z_dir=(0.9510565163, 0, -0.3090169944)), keep=Keep.TOP)


with BuildPart() as f4_tool165:
    # F4_s166 → F4_t167 (new body)
    with BuildSketch(Plane(origin=(-14.8914345198, 0, -45.8311228665), x_dir=(0, 1, 0), z_dir=(0.3090169944, 0, 0.9510565163))):
        with BuildLine():
            ThreePointArc((0, -41.9178760977), (-2.9289321881, -34.8468082858), (-10, -31.9178760977))
            Line((-10, -31.9178760977), (0, -31.9178760977))
            Line((0, -31.9178760977), (0, -41.9178760977))
        make_face()
    extrude(amount=F4_T167_DEPTH)

    split(bisect_by=Plane.XY.offset(-31.9178760977), keep=Keep.BOTTOM)


with BuildPart() as f4_tool161_1:
    add(f4_tool161.part)

    # F4_t169: intersect F4_tool165
    add(f4_tool165.part, mode=Mode.INTERSECT)


with BuildPart() as f1_23:
    add(f1_22.part)

    # F4_t159: cut F4_tool161
    add(f4_tool161_1.part, mode=Mode.SUBTRACT)


with BuildPart() as f4_tool172:
    # F4_s173 → F4_t174 (new body)
    with BuildSketch(Plane(origin=(38.9862817141, 0, -28.3251916741), x_dir=(0, 1, 0), z_dir=(-0.8090169944, 0, 0.5877852523))):
        with BuildLine():
            ThreePointArc((-100, -41.9178760977), (-97.0710678119, -34.8468082858), (-90, -31.9178760977))
            Line((-90, -31.9178760977), (-100, -31.9178760977))
            Line((-100, -31.9178760977), (-100, -41.9178760977))
        make_face()
    extrude(amount=F4_T174_DEPTH)

    split(bisect_by=Plane(origin=(30.355704049, 0, -9.8631661385), x_dir=(0, 1, 0), z_dir=(0.9510565163, 0, -0.3090169944)), keep=Keep.TOP)


with BuildPart() as f4_tool176:
    # F4_s177 → F4_t178 (new body)
    with BuildSketch(Plane(origin=(-14.8914345198, 0, -45.8311228665), x_dir=(0, 1, 0), z_dir=(0.3090169944, 0, 0.9510565163))):
        with BuildLine():
            ThreePointArc((-100, -41.9178760977), (-97.0710678119, -34.8468082858), (-90, -31.9178760977))
            Line((-90, -31.9178760977), (-100, -31.9178760977))
            Line((-100, -31.9178760977), (-100, -41.9178760977))
        make_face()
    extrude(amount=F4_T178_DEPTH)

    split(bisect_by=Plane(origin=(18.7608568547, 0, 25.8221041874), x_dir=(0, 1, 0), z_dir=(0.5877852523, 0, 0.8090169944)), keep=Keep.TOP)


with BuildPart() as f4_tool172_1:
    add(f4_tool172.part)

    # F4_t180: intersect F4_tool176
    add(f4_tool176.part, mode=Mode.INTERSECT)


with BuildPart() as f1_24:
    add(f1_23.part)

    # F4_t170: cut F4_tool172
    add(f4_tool172_1.part, mode=Mode.SUBTRACT)


with BuildPart() as f4_tool183:
    # F4_s184 → F4_t185 (new body)
    with BuildSketch(Plane(origin=(38.9862817141, 0, -28.3251916741), x_dir=(0, 1, 0), z_dir=(-0.8090169944, 0, 0.5877852523))):
        with BuildLine():
            ThreePointArc((-100, -41.9178760977), (-97.0710678119, -34.8468082858), (-90, -31.9178760977))
            Line((-90, -31.9178760977), (-100, -31.9178760977))
            Line((-100, -31.9178760977), (-100, -41.9178760977))
        make_face()
    extrude(amount=F4_T185_DEPTH)

    split(bisect_by=Plane(origin=(-18.7608568547, 0, 25.8221041874), x_dir=(0, 1, 0), z_dir=(-0.5877852523, 0, 0.8090169944)), keep=Keep.TOP)


with BuildPart() as f4_tool187:
    # F4_s188 → F4_t189 (new body)
    with BuildSketch(Plane(origin=(38.9862817141, 0, 28.3251916741), x_dir=(0, 1, 0), z_dir=(-0.8090169944, 0, -0.5877852523))):
        with BuildLine():
            ThreePointArc((-100, -41.9178760977), (-97.0710678119, -34.8468082858), (-90, -31.9178760977))
            Line((-90, -31.9178760977), (-100, -31.9178760977))
            Line((-100, -31.9178760977), (-100, -41.9178760977))
        make_face()
    extrude(amount=F4_T189_DEPTH)

    split(bisect_by=Plane(origin=(18.7608568547, 0, 25.8221041874), x_dir=(0, 1, 0), z_dir=(0.5877852523, 0, 0.8090169944)), keep=Keep.TOP)


with BuildPart() as f4_tool183_1:
    add(f4_tool183.part)

    # F4_t191: intersect F4_tool187
    add(f4_tool187.part, mode=Mode.INTERSECT)


with BuildPart() as f1_25:
    add(f1_24.part)

    # F4_t181: cut F4_tool183
    add(f4_tool183_1.part, mode=Mode.SUBTRACT)


with BuildPart() as f4_tool194:
    # F4_s195 → F4_t196 (new body)
    with BuildSketch(Plane(origin=(38.9862817141, 0, 28.3251916741), x_dir=(0, 1, 0), z_dir=(-0.8090169944, 0, -0.5877852523))):
        with BuildLine():
            ThreePointArc((-100, -41.9178760977), (-97.0710678119, -34.8468082858), (-90, -31.9178760977))
            Line((-90, -31.9178760977), (-100, -31.9178760977))
            Line((-100, -31.9178760977), (-100, -41.9178760977))
        make_face()
    extrude(amount=F4_T196_DEPTH)

    split(bisect_by=Plane(origin=(-30.355704049, 0, -9.8631661385), x_dir=(0, 1, 0), z_dir=(-0.9510565163, 0, -0.3090169944)), keep=Keep.TOP)


with BuildPart() as f4_tool198:
    # F4_s199 → F4_t200 (new body)
    with BuildSketch(Plane(origin=(-14.8914345198, 0, 45.8311228665), x_dir=(0, 1, 0), z_dir=(0.3090169944, 0, -0.9510565163))):
        with BuildLine():
            ThreePointArc((-100, -41.9178760977), (-97.0710678119, -34.8468082858), (-90, -31.9178760977))
            Line((-90, -31.9178760977), (-100, -31.9178760977))
            Line((-100, -31.9178760977), (-100, -41.9178760977))
        make_face()
    extrude(amount=F4_T200_DEPTH)

    split(bisect_by=Plane(origin=(-18.7608568547, 0, 25.8221041874), x_dir=(0, 1, 0), z_dir=(-0.5877852523, 0, 0.8090169944)), keep=Keep.TOP)


with BuildPart() as f4_tool194_1:
    add(f4_tool194.part)

    # F4_t202: intersect F4_tool198
    add(f4_tool198.part, mode=Mode.INTERSECT)


with BuildPart() as f1_26:
    add(f1_25.part)

    # F4_t192: cut F4_tool194
    add(f4_tool194_1.part, mode=Mode.SUBTRACT)


with BuildPart() as f4_tool205:
    # F4_s206 → F4_t207 (new body)
    with BuildSketch(Plane(origin=(-14.8914345198, 0, 45.8311228665), x_dir=(0, 1, 0), z_dir=(0.3090169944, 0, -0.9510565163))):
        with BuildLine():
            ThreePointArc((-100, -41.9178760977), (-97.0710678119, -34.8468082858), (-90, -31.9178760977))
            Line((-90, -31.9178760977), (-100, -31.9178760977))
            Line((-100, -31.9178760977), (-100, -41.9178760977))
        make_face()
    extrude(amount=F4_T207_DEPTH)

    split(bisect_by=Plane.XY.offset(-31.9178760977), keep=Keep.BOTTOM)


with BuildPart() as f4_tool209:
    # F4_s210 → F4_t211 (new body)
    with BuildSketch(Plane.YZ.offset(-48.1896943886)):
        with BuildLine():
            ThreePointArc((-100, -41.9178760977), (-97.0710678119, -34.8468082858), (-90, -31.9178760977))
            Line((-90, -31.9178760977), (-100, -31.9178760977))
            Line((-100, -31.9178760977), (-100, -41.9178760977))
        make_face()
    extrude(amount=F4_T211_DEPTH)

    split(bisect_by=Plane(origin=(-30.355704049, 0, -9.8631661385), x_dir=(0, 1, 0), z_dir=(-0.9510565163, 0, -0.3090169944)), keep=Keep.TOP)


with BuildPart() as f4_tool205_1:
    add(f4_tool205.part)

    # F4_t213: intersect F4_tool209
    add(f4_tool209.part, mode=Mode.INTERSECT)


with BuildPart() as f1_27:
    add(f1_26.part)

    # F4_t203: cut F4_tool205
    add(f4_tool205_1.part, mode=Mode.SUBTRACT)


with BuildPart() as f4_tool216:
    # F4_s217 → F4_t218 (new body)
    with BuildSketch(Plane.YZ.offset(-48.1896943886)):
        with BuildLine():
            ThreePointArc((-100, -41.9178760977), (-97.0710678119, -34.8468082858), (-90, -31.9178760977))
            Line((-90, -31.9178760977), (-100, -31.9178760977))
            Line((-100, -31.9178760977), (-100, -41.9178760977))
        make_face()
    extrude(amount=F4_T218_DEPTH)

    split(bisect_by=Plane(origin=(30.355704049, 0, -9.8631661385), x_dir=(0, 1, 0), z_dir=(0.9510565163, 0, -0.3090169944)), keep=Keep.TOP)


with BuildPart() as f4_tool220:
    # F4_s221 → F4_t222 (new body)
    with BuildSketch(Plane(origin=(-14.8914345198, 0, -45.8311228665), x_dir=(0, 1, 0), z_dir=(0.3090169944, 0, 0.9510565163))):
        with BuildLine():
            ThreePointArc((-100, -41.9178760977), (-97.0710678119, -34.8468082858), (-90, -31.9178760977))
            Line((-90, -31.9178760977), (-100, -31.9178760977))
            Line((-100, -31.9178760977), (-100, -41.9178760977))
        make_face()
    extrude(amount=F4_T222_DEPTH)

    split(bisect_by=Plane.XY.offset(-31.9178760977), keep=Keep.BOTTOM)


with BuildPart() as f4_tool216_1:
    add(f4_tool216.part)

    # F4_t224: intersect F4_tool220
    add(f4_tool220.part, mode=Mode.INTERSECT)


with BuildPart() as f1_28:
    add(f1_27.part)

    # F4_t214: cut F4_tool216
    add(f4_tool216_1.part, mode=Mode.SUBTRACT)


solid = f1_28.part
